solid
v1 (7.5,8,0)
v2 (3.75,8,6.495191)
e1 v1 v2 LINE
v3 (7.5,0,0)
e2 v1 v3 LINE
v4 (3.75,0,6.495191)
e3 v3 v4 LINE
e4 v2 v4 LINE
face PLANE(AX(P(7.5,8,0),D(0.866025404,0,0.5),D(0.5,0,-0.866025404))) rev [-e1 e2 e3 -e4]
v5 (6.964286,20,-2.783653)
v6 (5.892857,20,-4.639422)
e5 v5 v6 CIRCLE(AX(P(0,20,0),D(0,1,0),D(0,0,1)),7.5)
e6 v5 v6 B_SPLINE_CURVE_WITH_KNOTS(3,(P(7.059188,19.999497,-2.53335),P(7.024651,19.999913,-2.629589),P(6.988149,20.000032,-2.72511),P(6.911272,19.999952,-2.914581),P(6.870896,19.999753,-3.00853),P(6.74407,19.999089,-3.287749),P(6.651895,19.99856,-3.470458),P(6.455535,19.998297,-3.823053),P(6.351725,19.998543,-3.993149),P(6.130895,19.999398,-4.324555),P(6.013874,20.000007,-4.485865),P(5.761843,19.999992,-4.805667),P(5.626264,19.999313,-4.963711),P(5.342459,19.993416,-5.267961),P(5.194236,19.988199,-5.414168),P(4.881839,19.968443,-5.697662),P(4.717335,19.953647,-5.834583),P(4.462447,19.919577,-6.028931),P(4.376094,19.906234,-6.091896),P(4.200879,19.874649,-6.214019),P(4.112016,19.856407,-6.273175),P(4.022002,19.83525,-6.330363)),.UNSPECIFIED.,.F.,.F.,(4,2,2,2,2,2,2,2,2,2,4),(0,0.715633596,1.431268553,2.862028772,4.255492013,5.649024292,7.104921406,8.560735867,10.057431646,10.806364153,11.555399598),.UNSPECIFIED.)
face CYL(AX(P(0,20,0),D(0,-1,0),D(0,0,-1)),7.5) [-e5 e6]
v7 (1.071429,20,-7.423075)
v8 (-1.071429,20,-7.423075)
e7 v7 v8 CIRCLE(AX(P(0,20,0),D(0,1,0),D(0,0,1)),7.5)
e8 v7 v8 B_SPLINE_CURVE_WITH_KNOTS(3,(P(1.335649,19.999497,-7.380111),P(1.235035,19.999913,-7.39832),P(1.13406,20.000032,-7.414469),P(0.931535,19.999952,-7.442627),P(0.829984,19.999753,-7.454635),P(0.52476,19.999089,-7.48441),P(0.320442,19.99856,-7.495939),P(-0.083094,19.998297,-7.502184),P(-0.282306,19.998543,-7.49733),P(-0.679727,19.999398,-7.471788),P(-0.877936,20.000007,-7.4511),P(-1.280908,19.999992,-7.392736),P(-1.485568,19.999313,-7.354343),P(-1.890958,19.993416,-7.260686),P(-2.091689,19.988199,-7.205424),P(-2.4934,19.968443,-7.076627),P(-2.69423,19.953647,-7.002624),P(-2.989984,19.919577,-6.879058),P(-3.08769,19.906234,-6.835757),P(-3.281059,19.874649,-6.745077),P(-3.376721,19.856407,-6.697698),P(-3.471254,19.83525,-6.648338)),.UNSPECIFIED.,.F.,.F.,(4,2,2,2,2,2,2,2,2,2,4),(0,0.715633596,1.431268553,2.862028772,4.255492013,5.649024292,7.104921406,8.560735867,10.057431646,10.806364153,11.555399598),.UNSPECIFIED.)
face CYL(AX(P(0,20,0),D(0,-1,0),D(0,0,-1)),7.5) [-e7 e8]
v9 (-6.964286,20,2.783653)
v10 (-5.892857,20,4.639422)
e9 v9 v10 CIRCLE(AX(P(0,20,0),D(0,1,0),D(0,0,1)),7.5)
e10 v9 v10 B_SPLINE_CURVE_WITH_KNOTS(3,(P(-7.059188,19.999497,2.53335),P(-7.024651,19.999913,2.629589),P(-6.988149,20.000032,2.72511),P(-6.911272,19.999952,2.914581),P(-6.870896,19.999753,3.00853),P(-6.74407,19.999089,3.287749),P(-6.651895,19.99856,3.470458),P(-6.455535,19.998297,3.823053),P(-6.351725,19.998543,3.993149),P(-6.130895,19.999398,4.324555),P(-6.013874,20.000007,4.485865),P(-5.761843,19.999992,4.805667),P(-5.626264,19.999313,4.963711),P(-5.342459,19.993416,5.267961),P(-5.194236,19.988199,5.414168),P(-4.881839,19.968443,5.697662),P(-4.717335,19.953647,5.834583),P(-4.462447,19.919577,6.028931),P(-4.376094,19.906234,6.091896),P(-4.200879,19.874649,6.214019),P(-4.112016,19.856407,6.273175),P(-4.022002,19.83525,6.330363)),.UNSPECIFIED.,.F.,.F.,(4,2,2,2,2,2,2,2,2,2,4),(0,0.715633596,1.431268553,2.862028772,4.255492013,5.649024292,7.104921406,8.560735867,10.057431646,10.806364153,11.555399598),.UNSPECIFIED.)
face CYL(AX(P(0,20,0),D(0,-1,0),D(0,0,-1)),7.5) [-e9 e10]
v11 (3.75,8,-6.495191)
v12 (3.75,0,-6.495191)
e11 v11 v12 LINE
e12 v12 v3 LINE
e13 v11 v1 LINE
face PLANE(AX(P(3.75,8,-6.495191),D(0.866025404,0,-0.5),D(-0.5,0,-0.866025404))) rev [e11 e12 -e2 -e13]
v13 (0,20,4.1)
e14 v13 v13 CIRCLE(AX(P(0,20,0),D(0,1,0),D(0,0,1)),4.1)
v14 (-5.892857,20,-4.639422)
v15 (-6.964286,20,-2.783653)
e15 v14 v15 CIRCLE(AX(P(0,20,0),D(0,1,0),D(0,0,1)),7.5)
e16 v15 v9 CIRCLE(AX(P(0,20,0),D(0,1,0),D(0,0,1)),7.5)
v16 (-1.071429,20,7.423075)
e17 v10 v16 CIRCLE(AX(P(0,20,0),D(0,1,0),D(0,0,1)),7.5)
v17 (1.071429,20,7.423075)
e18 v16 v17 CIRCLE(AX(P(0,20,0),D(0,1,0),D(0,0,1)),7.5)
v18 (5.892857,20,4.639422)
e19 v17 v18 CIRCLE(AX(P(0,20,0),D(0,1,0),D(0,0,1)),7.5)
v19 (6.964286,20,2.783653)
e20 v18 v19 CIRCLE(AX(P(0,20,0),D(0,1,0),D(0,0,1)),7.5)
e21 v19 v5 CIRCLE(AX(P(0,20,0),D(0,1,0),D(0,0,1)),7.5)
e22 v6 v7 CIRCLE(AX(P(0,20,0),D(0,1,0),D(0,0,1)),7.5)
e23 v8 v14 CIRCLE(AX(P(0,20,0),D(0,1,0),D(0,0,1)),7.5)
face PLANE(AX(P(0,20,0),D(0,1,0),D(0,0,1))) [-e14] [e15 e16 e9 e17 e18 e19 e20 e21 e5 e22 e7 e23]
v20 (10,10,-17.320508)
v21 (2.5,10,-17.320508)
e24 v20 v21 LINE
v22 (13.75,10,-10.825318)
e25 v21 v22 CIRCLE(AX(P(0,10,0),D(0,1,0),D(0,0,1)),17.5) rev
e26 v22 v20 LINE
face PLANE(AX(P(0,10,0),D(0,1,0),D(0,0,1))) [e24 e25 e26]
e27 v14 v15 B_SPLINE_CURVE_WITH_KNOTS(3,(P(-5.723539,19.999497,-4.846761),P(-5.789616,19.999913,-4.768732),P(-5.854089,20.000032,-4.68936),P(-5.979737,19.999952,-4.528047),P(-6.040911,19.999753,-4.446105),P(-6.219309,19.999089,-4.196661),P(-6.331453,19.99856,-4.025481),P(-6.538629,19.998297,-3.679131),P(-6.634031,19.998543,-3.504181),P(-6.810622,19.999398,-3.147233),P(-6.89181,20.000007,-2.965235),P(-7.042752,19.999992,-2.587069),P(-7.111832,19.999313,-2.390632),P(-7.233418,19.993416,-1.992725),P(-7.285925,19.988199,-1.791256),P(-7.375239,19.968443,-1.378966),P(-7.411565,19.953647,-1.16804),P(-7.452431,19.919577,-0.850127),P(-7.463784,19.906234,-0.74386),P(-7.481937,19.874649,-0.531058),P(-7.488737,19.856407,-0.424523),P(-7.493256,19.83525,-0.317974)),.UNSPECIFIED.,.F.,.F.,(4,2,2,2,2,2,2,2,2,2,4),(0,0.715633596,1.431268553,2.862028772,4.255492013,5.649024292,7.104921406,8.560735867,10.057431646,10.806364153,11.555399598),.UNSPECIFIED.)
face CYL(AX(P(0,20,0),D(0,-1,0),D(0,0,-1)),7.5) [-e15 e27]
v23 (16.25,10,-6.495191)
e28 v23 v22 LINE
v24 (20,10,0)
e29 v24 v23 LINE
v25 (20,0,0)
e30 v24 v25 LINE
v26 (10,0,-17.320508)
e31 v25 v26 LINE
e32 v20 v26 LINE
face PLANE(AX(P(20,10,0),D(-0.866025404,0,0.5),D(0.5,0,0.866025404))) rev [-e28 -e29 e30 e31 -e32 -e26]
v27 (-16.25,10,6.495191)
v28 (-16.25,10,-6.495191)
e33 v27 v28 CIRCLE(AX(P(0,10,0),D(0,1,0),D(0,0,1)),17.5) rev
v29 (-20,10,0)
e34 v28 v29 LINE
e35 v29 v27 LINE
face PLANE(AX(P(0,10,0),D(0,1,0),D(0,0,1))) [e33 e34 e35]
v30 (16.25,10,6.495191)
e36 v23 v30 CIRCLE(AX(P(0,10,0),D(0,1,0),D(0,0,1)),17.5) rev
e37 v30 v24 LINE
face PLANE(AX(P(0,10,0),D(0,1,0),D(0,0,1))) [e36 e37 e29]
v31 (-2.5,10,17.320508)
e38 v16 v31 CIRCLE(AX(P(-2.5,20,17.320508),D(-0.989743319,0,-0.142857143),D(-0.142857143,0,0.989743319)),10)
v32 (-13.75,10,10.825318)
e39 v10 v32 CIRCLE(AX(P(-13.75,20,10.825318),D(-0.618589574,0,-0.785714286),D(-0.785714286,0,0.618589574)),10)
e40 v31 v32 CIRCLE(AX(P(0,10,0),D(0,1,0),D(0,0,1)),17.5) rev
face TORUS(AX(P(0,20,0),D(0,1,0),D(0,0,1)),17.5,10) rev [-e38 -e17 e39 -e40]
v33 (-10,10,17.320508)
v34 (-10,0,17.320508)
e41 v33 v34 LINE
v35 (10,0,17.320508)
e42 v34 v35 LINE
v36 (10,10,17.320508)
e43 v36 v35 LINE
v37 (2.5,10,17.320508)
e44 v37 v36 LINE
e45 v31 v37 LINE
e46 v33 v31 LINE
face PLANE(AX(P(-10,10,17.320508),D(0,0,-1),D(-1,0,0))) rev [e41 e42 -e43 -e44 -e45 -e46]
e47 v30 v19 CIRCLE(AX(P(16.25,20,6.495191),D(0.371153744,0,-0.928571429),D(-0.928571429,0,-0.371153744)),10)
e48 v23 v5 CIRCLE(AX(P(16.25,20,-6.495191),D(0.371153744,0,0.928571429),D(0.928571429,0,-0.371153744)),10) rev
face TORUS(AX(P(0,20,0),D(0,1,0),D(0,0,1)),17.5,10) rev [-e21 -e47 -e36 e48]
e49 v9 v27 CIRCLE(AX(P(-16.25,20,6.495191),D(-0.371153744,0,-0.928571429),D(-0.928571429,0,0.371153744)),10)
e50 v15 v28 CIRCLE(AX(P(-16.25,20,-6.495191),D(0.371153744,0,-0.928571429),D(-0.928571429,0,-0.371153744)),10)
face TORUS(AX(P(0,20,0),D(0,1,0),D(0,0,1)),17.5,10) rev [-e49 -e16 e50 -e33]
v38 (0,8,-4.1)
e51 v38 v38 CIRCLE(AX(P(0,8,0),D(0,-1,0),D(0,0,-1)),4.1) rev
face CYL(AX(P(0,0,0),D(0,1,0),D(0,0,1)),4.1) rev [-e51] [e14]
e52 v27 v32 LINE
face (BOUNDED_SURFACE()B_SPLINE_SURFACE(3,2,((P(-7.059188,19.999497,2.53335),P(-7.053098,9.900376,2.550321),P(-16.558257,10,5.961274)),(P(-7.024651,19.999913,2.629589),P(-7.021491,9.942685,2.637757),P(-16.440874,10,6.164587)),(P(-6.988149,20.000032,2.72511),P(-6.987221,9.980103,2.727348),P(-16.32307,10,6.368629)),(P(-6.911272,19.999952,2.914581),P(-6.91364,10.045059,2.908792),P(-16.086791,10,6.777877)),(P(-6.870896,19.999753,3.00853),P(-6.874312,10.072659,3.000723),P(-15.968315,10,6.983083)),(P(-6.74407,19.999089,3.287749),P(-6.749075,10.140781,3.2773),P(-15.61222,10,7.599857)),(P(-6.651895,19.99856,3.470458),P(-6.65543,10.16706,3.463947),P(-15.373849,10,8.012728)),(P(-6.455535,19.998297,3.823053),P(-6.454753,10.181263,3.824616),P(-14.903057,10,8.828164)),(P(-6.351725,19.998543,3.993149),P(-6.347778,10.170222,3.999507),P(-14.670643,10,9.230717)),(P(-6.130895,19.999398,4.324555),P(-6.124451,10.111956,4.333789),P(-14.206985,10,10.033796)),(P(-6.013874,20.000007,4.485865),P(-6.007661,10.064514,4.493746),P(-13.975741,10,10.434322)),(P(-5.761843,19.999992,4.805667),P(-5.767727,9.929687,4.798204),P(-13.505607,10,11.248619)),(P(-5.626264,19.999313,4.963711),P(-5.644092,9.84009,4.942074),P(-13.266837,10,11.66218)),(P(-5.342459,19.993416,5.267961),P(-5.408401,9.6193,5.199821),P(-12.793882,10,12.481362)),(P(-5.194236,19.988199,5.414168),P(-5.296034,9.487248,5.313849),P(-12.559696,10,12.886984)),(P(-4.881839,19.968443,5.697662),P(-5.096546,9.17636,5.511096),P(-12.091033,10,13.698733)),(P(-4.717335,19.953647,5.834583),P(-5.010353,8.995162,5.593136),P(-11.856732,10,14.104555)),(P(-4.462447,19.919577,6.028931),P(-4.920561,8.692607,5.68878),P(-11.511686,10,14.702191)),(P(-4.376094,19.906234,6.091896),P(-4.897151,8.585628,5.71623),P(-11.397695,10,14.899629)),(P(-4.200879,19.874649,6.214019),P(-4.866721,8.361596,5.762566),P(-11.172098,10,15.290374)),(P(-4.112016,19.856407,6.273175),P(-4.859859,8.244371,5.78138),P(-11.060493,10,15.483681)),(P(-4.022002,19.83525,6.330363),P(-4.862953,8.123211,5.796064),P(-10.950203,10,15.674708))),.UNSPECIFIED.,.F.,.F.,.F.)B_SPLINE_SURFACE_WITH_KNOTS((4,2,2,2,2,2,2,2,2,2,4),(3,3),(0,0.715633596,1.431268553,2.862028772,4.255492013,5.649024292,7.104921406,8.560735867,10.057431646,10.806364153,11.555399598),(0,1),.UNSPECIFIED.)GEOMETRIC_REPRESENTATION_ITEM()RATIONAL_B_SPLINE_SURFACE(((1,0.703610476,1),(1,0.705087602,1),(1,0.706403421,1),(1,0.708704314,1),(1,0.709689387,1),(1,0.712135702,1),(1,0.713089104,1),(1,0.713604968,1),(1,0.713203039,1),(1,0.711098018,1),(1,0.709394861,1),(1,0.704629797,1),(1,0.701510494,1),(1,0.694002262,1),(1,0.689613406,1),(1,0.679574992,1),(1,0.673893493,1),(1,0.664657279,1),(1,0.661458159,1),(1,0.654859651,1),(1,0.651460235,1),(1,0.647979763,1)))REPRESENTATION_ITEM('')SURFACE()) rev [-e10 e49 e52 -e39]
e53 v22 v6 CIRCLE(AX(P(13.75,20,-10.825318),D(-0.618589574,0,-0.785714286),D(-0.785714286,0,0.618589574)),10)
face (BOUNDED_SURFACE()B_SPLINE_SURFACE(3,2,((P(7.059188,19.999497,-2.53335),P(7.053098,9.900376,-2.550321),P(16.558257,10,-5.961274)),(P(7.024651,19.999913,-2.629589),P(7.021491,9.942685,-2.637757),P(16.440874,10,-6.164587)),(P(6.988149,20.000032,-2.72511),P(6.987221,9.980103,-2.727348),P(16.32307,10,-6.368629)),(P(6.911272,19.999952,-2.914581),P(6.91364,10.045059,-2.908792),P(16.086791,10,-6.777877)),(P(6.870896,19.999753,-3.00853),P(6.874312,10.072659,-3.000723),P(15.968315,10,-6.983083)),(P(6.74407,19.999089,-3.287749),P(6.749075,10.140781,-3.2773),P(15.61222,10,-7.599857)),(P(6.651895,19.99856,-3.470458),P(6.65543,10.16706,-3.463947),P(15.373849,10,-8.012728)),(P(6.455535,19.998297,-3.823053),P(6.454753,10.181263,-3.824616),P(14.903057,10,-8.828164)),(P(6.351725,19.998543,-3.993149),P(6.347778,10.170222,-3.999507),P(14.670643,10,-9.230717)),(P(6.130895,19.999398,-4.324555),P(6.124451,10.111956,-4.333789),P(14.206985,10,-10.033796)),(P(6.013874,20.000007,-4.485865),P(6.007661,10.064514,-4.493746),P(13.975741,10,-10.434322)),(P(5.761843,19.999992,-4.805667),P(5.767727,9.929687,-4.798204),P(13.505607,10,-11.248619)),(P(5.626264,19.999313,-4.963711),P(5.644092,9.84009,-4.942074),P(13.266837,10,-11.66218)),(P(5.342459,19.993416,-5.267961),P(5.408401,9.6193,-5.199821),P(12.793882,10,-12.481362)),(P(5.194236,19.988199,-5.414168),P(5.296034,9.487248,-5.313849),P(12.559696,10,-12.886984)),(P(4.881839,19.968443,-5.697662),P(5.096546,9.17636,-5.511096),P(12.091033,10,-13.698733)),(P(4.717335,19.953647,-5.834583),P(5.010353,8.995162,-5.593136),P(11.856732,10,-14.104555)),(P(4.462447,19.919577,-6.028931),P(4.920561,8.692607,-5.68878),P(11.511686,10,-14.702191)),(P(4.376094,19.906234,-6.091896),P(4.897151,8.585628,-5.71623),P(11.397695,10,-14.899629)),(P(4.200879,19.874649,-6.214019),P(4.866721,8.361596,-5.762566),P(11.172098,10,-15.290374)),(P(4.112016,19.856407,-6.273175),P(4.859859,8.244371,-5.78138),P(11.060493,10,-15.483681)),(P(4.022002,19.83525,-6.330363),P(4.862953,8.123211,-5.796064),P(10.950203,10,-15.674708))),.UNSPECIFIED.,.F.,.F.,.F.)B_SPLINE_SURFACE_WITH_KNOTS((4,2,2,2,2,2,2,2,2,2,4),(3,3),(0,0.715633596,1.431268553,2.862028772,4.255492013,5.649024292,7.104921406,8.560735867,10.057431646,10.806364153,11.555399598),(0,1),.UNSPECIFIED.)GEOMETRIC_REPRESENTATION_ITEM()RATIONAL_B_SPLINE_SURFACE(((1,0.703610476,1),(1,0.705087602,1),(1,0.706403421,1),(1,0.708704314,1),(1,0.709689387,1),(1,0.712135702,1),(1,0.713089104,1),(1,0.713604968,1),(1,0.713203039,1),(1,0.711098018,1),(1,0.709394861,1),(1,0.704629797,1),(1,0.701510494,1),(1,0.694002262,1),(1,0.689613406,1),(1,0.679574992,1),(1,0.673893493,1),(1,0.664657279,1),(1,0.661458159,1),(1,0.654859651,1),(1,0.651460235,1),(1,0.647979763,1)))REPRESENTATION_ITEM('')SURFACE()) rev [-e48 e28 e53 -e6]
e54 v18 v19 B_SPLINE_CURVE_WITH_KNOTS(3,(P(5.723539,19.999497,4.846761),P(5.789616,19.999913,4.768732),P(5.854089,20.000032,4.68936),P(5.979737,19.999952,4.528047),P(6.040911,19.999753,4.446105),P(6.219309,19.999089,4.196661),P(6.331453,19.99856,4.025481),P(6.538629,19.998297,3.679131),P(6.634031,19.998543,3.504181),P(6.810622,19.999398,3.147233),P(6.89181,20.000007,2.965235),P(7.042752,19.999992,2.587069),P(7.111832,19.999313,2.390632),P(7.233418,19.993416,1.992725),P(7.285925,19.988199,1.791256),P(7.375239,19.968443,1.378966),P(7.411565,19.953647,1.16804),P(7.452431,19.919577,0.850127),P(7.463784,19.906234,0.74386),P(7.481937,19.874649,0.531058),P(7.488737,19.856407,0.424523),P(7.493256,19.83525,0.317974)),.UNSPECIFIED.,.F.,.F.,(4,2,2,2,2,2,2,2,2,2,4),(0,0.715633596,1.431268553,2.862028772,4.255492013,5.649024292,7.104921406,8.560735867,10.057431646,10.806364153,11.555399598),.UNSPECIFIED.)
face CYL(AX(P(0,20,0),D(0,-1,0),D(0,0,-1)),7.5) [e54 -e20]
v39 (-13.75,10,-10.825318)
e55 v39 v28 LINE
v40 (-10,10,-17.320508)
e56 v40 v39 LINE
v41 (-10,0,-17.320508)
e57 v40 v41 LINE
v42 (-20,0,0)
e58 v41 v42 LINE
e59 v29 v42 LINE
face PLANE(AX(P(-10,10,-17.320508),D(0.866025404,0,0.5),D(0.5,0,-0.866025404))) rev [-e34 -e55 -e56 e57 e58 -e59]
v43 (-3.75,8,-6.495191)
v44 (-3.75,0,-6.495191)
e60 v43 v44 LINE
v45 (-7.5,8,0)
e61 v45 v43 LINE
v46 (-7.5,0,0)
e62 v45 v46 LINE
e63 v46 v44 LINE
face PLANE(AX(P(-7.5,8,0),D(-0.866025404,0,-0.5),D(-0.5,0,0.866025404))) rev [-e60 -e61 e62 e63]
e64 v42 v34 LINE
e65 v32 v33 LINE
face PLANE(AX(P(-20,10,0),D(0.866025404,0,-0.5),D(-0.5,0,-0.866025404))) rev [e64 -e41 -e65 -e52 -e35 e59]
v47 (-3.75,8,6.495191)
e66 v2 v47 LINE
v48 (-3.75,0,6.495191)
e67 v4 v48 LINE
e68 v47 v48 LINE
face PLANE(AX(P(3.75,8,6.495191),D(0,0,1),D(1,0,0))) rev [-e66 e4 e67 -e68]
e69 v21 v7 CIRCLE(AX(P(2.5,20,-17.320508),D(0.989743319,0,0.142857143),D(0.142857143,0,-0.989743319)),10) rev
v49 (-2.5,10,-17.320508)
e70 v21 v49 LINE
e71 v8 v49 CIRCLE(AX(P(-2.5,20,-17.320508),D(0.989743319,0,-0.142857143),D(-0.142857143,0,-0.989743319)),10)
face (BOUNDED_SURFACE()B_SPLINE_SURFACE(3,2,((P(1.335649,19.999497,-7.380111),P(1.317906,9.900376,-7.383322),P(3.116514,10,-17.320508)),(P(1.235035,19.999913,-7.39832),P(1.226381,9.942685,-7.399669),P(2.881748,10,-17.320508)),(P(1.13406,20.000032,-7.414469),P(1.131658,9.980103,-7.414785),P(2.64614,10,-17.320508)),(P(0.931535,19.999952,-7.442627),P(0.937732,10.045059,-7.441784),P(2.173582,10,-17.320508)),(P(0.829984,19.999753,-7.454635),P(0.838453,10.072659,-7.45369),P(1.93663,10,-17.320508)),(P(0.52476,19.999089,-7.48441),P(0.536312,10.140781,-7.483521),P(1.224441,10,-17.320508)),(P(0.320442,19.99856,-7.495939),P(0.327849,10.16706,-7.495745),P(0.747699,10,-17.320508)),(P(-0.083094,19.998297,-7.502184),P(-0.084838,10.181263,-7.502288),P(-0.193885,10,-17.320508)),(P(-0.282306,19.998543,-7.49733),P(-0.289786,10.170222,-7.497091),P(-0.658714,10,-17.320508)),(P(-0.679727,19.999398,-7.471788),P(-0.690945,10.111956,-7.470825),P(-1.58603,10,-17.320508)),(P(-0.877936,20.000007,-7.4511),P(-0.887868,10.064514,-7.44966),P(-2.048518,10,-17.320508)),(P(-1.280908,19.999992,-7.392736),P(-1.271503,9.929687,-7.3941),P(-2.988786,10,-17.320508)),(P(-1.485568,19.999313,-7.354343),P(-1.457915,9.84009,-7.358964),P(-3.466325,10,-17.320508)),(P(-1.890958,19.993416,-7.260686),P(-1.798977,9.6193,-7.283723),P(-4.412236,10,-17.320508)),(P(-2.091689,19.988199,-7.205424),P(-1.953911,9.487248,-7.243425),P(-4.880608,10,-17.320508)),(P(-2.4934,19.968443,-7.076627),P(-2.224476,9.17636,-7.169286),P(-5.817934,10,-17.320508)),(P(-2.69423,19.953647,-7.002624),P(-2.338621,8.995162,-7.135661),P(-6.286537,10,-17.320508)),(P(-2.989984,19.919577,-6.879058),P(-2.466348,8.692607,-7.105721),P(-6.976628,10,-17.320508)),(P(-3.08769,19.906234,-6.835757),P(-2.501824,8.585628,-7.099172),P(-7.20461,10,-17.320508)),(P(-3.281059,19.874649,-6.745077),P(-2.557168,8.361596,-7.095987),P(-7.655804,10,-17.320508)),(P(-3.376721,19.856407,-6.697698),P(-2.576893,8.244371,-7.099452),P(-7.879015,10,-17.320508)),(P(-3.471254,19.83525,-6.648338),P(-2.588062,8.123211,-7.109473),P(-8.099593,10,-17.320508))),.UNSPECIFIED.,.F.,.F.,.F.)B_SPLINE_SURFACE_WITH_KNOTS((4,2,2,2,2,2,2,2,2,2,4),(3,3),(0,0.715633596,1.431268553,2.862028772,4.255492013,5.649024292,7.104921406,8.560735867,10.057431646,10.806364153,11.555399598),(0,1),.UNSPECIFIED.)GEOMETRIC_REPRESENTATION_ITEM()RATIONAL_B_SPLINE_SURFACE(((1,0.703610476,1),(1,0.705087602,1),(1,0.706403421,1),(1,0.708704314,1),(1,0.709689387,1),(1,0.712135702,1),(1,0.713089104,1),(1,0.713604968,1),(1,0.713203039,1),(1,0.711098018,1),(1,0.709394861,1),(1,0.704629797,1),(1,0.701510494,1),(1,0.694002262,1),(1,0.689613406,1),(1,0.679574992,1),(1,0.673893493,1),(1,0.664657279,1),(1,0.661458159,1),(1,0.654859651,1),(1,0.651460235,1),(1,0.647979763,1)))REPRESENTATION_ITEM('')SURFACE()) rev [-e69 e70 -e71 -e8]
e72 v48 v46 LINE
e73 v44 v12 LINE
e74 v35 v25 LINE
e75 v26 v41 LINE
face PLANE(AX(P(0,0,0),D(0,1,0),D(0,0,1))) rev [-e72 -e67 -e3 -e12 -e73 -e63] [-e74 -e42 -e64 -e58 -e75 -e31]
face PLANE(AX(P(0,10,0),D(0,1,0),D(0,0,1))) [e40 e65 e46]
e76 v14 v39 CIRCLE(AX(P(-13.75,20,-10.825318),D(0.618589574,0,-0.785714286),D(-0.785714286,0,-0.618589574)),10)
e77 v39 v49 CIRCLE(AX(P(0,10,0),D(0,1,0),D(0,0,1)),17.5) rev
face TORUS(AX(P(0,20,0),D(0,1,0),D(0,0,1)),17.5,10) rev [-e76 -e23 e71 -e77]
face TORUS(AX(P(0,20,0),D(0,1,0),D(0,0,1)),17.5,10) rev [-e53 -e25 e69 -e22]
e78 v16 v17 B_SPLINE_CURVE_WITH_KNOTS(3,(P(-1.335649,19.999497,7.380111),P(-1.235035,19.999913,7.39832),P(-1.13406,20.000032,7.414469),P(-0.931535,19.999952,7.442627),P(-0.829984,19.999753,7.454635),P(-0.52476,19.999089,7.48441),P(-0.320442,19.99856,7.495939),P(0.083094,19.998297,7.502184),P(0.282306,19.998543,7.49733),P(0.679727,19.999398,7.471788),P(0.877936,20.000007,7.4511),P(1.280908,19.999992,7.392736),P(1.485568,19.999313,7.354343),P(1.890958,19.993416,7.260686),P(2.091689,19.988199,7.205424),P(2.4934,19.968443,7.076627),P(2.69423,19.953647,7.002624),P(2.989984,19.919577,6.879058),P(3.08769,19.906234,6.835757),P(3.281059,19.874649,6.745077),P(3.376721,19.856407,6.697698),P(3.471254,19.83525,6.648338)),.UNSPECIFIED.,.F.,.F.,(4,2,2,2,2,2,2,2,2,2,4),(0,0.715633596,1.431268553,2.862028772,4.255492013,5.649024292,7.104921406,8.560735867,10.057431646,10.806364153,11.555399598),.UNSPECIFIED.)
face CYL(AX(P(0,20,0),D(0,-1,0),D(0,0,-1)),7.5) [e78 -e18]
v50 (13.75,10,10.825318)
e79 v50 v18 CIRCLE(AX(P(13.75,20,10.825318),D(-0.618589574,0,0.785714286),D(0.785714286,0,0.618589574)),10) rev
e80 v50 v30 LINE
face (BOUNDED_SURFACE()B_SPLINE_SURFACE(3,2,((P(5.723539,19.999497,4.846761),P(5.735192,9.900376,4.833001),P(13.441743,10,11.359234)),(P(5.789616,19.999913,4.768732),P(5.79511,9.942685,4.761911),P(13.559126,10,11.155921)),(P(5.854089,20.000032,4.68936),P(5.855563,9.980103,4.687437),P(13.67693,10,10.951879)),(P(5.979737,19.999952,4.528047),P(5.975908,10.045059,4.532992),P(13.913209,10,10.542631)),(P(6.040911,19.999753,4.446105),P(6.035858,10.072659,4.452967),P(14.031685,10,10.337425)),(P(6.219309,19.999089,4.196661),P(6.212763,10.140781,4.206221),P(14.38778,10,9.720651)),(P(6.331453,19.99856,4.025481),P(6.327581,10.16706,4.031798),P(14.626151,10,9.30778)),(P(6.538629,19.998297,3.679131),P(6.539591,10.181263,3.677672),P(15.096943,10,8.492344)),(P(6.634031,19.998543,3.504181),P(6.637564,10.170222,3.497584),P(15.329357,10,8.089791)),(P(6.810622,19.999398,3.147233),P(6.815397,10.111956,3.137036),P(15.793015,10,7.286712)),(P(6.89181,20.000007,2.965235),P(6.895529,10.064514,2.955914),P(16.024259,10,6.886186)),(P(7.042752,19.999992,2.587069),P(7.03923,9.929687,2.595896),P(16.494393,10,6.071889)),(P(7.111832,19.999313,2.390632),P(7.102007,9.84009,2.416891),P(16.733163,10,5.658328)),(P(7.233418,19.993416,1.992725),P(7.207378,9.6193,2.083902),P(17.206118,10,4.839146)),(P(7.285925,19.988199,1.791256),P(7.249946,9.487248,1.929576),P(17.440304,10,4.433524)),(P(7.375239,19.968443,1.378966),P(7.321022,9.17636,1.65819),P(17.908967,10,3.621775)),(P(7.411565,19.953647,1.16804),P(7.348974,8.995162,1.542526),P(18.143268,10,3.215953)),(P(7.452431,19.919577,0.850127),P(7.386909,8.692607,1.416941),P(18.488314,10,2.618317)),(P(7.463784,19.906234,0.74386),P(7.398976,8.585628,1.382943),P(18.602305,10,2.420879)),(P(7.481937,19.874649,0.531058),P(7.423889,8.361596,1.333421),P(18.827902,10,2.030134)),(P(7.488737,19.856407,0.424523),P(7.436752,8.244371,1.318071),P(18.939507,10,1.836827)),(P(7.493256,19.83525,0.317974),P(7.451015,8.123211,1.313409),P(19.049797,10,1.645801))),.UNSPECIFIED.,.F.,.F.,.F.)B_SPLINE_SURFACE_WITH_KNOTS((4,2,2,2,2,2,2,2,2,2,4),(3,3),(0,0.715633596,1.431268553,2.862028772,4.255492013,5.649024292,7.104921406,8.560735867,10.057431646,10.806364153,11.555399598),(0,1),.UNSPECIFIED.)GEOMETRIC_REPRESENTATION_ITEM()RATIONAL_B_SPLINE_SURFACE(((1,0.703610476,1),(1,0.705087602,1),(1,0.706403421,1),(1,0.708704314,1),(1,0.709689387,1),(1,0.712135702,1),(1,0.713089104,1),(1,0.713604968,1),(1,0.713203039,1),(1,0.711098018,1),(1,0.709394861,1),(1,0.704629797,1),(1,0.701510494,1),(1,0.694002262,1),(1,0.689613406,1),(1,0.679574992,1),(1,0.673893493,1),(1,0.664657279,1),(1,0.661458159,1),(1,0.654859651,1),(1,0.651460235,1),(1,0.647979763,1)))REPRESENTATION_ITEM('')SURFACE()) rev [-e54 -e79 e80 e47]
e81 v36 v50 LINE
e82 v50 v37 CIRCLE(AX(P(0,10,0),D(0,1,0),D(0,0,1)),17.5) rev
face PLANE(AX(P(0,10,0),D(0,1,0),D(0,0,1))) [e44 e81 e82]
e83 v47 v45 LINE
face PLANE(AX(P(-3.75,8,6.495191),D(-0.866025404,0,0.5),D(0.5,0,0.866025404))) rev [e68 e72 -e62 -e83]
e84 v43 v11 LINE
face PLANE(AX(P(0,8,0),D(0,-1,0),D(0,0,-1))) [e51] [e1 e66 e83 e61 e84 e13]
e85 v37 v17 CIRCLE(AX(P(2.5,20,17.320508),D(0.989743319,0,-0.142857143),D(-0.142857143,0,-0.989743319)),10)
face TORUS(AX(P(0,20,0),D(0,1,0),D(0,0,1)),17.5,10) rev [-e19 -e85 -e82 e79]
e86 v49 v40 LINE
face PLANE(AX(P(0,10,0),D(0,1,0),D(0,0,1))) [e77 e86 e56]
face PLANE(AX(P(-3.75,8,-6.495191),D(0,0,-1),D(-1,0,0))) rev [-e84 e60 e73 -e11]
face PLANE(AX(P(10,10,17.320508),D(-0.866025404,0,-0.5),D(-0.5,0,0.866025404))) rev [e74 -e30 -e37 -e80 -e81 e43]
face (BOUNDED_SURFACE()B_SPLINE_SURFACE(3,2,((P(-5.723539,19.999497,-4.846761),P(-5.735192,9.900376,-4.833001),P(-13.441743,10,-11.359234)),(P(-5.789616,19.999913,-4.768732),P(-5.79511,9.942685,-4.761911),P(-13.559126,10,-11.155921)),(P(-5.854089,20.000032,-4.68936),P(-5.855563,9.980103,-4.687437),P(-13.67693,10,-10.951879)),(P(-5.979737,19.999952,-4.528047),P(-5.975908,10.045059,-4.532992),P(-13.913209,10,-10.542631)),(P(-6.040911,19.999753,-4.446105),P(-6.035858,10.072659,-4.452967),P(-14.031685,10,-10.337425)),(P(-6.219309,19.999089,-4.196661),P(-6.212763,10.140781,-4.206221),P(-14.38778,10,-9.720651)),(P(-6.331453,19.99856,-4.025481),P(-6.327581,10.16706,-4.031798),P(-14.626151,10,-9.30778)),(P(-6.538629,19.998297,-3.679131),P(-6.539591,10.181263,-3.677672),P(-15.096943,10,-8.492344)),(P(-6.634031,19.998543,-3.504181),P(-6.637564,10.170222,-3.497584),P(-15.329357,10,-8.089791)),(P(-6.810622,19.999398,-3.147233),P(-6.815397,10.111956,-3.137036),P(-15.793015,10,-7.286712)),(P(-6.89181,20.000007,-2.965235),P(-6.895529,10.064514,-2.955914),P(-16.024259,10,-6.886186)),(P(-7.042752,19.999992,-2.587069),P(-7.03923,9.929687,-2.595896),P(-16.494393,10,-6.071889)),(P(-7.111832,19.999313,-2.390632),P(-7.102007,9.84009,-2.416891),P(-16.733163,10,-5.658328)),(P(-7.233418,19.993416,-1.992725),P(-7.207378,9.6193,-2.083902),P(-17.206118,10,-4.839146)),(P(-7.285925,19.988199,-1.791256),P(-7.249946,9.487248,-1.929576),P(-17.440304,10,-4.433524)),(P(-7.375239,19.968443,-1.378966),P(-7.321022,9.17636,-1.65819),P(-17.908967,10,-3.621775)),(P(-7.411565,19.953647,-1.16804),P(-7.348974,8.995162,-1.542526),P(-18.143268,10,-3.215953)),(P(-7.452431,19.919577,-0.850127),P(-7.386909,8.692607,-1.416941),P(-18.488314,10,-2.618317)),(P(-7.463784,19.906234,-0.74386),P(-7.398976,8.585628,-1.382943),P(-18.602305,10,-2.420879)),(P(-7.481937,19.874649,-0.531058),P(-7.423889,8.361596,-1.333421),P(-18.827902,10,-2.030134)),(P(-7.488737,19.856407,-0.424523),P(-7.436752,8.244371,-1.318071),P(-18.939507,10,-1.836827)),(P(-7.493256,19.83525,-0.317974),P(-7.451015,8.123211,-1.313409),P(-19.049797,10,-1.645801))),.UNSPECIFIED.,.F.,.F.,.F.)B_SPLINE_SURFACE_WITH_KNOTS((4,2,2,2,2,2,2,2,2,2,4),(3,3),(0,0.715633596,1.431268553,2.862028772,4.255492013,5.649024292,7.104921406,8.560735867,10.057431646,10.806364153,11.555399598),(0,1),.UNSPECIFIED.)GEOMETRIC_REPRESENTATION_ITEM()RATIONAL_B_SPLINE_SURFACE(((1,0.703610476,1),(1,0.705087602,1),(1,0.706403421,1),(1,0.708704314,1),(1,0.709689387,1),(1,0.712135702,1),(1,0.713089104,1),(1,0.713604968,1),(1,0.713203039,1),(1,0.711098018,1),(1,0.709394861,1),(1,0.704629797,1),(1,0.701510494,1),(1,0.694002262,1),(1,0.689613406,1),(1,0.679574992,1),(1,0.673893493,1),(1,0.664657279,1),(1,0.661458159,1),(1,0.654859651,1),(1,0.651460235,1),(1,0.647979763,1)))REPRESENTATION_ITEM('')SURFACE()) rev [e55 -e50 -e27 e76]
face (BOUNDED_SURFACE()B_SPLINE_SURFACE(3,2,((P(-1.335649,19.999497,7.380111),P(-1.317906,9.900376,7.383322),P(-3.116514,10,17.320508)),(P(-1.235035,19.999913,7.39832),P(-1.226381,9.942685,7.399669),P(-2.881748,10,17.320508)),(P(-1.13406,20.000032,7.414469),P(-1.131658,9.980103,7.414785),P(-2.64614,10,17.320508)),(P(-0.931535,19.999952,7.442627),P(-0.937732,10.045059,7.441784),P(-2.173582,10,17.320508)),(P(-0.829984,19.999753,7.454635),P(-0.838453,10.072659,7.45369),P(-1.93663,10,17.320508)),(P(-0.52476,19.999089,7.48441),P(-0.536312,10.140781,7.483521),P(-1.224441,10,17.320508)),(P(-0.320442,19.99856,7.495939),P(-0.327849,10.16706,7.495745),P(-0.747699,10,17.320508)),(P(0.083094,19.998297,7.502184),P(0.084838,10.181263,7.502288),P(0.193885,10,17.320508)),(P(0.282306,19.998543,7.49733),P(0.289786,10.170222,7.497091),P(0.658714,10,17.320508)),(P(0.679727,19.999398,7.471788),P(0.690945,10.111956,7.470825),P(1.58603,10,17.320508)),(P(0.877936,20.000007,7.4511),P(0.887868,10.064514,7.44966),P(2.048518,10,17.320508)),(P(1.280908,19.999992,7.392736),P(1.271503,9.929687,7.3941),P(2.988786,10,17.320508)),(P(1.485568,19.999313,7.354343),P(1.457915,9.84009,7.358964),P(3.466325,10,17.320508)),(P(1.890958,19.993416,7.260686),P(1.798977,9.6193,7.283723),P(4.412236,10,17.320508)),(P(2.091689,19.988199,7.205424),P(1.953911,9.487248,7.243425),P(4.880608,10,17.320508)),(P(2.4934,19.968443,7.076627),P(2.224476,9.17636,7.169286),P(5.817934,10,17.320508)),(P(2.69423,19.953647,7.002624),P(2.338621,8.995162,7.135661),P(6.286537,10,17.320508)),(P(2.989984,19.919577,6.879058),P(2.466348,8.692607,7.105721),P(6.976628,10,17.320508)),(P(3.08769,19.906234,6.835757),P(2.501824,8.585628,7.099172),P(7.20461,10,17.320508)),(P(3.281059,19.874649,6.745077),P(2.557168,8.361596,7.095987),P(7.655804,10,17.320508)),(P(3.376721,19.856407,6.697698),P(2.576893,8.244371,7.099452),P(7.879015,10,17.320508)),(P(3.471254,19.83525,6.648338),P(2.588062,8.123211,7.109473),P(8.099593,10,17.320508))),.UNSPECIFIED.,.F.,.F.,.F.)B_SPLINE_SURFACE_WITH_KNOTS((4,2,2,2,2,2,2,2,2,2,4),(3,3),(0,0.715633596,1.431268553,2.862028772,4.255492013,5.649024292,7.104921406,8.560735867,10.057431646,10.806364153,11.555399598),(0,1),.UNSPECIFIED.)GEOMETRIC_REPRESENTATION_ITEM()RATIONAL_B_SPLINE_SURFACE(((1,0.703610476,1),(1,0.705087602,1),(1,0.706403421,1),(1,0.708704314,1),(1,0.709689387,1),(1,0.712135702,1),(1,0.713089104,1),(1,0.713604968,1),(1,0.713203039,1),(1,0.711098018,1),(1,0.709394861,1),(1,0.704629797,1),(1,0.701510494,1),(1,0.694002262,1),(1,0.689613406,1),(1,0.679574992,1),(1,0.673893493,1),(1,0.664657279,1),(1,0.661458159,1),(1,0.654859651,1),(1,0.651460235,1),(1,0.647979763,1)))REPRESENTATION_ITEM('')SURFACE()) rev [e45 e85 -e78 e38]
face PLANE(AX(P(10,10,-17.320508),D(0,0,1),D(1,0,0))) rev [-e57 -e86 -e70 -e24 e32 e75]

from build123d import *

# Parameters (mm, degrees)
BOSS_EXTRUDE1_DEPTH = 10
SKETCH2_R           = 4.1
CUT_EXTRUDE1_DEPTH  = 29.284271247
CUT_EXTRUDE2_DEPTH  = 8
BOSS_EXTRUDE2_START = 10
SKETCH4_R           = 7.5
SKETCH4_R_2         = 4.1
BOSS_EXTRUDE2_DEPTH = 10
FILLET1_R           = 10


with BuildPart() as part:
    # Sketch1 → Boss-Extrude1 (new body)
    with BuildSketch(Plane(origin=(0, 0, 0), x_dir=(1, 0, 0), z_dir=(0, 1, 0))):
        Polygon((-10, 17.320508076), (-20, 0), (-10, -17.320508076), (10, -17.320508076), (20, 0), (10, 17.320508076), align=None)
    extrude(amount=BOSS_EXTRUDE1_DEPTH)

    # Sketch2 → Cut-Extrude1 (cut, through all)
    with BuildSketch(Plane(origin=(0, 10, 0), x_dir=(1, 0, 0), z_dir=(0, 1, 0))):
        with Locations(Location((0, 0, 0), (0, 0, 270))):
            Circle(SKETCH2_R)
    extrude(amount=-CUT_EXTRUDE1_DEPTH, mode=Mode.SUBTRACT)

    # Sketch3 → Cut-Extrude2 (cut)
    with BuildSketch(Plane.XZ):
        Polygon((7.5, 0), (3.75, 6.495190528), (-3.75, 6.495190528), (-7.5, 0), (-3.75, -6.495190528), (3.75, -6.495190528), align=None)
    extrude(amount=-CUT_EXTRUDE2_DEPTH, mode=Mode.SUBTRACT)

    # Sketch4 → Boss-Extrude2 (add)
    with BuildSketch(Plane(origin=(0, 10, 0), x_dir=(1, 0, 0), z_dir=(0, 1, 0)).offset(BOSS_EXTRUDE2_START)):
        with Locations(Location((0, 0, 0), (0, 0, 270))):
            Circle(SKETCH4_R)
        with Locations(Location((0, 0, 0), (0, 0, 270))):
            Circle(SKETCH4_R_2, mode=Mode.SUBTRACT)
    extrude(amount=-BOSS_EXTRUDE2_DEPTH)

    # Fillet1
    fillet1_edges = [part.edges().sort_by_distance(p)[0] for p in [
        (0, 10, -7.5),
    ]]
    fillet(fillet1_edges, radius=FILLET1_R - 0.0001)  # a hair under: the kernel refuses the full size


solid = part.part
